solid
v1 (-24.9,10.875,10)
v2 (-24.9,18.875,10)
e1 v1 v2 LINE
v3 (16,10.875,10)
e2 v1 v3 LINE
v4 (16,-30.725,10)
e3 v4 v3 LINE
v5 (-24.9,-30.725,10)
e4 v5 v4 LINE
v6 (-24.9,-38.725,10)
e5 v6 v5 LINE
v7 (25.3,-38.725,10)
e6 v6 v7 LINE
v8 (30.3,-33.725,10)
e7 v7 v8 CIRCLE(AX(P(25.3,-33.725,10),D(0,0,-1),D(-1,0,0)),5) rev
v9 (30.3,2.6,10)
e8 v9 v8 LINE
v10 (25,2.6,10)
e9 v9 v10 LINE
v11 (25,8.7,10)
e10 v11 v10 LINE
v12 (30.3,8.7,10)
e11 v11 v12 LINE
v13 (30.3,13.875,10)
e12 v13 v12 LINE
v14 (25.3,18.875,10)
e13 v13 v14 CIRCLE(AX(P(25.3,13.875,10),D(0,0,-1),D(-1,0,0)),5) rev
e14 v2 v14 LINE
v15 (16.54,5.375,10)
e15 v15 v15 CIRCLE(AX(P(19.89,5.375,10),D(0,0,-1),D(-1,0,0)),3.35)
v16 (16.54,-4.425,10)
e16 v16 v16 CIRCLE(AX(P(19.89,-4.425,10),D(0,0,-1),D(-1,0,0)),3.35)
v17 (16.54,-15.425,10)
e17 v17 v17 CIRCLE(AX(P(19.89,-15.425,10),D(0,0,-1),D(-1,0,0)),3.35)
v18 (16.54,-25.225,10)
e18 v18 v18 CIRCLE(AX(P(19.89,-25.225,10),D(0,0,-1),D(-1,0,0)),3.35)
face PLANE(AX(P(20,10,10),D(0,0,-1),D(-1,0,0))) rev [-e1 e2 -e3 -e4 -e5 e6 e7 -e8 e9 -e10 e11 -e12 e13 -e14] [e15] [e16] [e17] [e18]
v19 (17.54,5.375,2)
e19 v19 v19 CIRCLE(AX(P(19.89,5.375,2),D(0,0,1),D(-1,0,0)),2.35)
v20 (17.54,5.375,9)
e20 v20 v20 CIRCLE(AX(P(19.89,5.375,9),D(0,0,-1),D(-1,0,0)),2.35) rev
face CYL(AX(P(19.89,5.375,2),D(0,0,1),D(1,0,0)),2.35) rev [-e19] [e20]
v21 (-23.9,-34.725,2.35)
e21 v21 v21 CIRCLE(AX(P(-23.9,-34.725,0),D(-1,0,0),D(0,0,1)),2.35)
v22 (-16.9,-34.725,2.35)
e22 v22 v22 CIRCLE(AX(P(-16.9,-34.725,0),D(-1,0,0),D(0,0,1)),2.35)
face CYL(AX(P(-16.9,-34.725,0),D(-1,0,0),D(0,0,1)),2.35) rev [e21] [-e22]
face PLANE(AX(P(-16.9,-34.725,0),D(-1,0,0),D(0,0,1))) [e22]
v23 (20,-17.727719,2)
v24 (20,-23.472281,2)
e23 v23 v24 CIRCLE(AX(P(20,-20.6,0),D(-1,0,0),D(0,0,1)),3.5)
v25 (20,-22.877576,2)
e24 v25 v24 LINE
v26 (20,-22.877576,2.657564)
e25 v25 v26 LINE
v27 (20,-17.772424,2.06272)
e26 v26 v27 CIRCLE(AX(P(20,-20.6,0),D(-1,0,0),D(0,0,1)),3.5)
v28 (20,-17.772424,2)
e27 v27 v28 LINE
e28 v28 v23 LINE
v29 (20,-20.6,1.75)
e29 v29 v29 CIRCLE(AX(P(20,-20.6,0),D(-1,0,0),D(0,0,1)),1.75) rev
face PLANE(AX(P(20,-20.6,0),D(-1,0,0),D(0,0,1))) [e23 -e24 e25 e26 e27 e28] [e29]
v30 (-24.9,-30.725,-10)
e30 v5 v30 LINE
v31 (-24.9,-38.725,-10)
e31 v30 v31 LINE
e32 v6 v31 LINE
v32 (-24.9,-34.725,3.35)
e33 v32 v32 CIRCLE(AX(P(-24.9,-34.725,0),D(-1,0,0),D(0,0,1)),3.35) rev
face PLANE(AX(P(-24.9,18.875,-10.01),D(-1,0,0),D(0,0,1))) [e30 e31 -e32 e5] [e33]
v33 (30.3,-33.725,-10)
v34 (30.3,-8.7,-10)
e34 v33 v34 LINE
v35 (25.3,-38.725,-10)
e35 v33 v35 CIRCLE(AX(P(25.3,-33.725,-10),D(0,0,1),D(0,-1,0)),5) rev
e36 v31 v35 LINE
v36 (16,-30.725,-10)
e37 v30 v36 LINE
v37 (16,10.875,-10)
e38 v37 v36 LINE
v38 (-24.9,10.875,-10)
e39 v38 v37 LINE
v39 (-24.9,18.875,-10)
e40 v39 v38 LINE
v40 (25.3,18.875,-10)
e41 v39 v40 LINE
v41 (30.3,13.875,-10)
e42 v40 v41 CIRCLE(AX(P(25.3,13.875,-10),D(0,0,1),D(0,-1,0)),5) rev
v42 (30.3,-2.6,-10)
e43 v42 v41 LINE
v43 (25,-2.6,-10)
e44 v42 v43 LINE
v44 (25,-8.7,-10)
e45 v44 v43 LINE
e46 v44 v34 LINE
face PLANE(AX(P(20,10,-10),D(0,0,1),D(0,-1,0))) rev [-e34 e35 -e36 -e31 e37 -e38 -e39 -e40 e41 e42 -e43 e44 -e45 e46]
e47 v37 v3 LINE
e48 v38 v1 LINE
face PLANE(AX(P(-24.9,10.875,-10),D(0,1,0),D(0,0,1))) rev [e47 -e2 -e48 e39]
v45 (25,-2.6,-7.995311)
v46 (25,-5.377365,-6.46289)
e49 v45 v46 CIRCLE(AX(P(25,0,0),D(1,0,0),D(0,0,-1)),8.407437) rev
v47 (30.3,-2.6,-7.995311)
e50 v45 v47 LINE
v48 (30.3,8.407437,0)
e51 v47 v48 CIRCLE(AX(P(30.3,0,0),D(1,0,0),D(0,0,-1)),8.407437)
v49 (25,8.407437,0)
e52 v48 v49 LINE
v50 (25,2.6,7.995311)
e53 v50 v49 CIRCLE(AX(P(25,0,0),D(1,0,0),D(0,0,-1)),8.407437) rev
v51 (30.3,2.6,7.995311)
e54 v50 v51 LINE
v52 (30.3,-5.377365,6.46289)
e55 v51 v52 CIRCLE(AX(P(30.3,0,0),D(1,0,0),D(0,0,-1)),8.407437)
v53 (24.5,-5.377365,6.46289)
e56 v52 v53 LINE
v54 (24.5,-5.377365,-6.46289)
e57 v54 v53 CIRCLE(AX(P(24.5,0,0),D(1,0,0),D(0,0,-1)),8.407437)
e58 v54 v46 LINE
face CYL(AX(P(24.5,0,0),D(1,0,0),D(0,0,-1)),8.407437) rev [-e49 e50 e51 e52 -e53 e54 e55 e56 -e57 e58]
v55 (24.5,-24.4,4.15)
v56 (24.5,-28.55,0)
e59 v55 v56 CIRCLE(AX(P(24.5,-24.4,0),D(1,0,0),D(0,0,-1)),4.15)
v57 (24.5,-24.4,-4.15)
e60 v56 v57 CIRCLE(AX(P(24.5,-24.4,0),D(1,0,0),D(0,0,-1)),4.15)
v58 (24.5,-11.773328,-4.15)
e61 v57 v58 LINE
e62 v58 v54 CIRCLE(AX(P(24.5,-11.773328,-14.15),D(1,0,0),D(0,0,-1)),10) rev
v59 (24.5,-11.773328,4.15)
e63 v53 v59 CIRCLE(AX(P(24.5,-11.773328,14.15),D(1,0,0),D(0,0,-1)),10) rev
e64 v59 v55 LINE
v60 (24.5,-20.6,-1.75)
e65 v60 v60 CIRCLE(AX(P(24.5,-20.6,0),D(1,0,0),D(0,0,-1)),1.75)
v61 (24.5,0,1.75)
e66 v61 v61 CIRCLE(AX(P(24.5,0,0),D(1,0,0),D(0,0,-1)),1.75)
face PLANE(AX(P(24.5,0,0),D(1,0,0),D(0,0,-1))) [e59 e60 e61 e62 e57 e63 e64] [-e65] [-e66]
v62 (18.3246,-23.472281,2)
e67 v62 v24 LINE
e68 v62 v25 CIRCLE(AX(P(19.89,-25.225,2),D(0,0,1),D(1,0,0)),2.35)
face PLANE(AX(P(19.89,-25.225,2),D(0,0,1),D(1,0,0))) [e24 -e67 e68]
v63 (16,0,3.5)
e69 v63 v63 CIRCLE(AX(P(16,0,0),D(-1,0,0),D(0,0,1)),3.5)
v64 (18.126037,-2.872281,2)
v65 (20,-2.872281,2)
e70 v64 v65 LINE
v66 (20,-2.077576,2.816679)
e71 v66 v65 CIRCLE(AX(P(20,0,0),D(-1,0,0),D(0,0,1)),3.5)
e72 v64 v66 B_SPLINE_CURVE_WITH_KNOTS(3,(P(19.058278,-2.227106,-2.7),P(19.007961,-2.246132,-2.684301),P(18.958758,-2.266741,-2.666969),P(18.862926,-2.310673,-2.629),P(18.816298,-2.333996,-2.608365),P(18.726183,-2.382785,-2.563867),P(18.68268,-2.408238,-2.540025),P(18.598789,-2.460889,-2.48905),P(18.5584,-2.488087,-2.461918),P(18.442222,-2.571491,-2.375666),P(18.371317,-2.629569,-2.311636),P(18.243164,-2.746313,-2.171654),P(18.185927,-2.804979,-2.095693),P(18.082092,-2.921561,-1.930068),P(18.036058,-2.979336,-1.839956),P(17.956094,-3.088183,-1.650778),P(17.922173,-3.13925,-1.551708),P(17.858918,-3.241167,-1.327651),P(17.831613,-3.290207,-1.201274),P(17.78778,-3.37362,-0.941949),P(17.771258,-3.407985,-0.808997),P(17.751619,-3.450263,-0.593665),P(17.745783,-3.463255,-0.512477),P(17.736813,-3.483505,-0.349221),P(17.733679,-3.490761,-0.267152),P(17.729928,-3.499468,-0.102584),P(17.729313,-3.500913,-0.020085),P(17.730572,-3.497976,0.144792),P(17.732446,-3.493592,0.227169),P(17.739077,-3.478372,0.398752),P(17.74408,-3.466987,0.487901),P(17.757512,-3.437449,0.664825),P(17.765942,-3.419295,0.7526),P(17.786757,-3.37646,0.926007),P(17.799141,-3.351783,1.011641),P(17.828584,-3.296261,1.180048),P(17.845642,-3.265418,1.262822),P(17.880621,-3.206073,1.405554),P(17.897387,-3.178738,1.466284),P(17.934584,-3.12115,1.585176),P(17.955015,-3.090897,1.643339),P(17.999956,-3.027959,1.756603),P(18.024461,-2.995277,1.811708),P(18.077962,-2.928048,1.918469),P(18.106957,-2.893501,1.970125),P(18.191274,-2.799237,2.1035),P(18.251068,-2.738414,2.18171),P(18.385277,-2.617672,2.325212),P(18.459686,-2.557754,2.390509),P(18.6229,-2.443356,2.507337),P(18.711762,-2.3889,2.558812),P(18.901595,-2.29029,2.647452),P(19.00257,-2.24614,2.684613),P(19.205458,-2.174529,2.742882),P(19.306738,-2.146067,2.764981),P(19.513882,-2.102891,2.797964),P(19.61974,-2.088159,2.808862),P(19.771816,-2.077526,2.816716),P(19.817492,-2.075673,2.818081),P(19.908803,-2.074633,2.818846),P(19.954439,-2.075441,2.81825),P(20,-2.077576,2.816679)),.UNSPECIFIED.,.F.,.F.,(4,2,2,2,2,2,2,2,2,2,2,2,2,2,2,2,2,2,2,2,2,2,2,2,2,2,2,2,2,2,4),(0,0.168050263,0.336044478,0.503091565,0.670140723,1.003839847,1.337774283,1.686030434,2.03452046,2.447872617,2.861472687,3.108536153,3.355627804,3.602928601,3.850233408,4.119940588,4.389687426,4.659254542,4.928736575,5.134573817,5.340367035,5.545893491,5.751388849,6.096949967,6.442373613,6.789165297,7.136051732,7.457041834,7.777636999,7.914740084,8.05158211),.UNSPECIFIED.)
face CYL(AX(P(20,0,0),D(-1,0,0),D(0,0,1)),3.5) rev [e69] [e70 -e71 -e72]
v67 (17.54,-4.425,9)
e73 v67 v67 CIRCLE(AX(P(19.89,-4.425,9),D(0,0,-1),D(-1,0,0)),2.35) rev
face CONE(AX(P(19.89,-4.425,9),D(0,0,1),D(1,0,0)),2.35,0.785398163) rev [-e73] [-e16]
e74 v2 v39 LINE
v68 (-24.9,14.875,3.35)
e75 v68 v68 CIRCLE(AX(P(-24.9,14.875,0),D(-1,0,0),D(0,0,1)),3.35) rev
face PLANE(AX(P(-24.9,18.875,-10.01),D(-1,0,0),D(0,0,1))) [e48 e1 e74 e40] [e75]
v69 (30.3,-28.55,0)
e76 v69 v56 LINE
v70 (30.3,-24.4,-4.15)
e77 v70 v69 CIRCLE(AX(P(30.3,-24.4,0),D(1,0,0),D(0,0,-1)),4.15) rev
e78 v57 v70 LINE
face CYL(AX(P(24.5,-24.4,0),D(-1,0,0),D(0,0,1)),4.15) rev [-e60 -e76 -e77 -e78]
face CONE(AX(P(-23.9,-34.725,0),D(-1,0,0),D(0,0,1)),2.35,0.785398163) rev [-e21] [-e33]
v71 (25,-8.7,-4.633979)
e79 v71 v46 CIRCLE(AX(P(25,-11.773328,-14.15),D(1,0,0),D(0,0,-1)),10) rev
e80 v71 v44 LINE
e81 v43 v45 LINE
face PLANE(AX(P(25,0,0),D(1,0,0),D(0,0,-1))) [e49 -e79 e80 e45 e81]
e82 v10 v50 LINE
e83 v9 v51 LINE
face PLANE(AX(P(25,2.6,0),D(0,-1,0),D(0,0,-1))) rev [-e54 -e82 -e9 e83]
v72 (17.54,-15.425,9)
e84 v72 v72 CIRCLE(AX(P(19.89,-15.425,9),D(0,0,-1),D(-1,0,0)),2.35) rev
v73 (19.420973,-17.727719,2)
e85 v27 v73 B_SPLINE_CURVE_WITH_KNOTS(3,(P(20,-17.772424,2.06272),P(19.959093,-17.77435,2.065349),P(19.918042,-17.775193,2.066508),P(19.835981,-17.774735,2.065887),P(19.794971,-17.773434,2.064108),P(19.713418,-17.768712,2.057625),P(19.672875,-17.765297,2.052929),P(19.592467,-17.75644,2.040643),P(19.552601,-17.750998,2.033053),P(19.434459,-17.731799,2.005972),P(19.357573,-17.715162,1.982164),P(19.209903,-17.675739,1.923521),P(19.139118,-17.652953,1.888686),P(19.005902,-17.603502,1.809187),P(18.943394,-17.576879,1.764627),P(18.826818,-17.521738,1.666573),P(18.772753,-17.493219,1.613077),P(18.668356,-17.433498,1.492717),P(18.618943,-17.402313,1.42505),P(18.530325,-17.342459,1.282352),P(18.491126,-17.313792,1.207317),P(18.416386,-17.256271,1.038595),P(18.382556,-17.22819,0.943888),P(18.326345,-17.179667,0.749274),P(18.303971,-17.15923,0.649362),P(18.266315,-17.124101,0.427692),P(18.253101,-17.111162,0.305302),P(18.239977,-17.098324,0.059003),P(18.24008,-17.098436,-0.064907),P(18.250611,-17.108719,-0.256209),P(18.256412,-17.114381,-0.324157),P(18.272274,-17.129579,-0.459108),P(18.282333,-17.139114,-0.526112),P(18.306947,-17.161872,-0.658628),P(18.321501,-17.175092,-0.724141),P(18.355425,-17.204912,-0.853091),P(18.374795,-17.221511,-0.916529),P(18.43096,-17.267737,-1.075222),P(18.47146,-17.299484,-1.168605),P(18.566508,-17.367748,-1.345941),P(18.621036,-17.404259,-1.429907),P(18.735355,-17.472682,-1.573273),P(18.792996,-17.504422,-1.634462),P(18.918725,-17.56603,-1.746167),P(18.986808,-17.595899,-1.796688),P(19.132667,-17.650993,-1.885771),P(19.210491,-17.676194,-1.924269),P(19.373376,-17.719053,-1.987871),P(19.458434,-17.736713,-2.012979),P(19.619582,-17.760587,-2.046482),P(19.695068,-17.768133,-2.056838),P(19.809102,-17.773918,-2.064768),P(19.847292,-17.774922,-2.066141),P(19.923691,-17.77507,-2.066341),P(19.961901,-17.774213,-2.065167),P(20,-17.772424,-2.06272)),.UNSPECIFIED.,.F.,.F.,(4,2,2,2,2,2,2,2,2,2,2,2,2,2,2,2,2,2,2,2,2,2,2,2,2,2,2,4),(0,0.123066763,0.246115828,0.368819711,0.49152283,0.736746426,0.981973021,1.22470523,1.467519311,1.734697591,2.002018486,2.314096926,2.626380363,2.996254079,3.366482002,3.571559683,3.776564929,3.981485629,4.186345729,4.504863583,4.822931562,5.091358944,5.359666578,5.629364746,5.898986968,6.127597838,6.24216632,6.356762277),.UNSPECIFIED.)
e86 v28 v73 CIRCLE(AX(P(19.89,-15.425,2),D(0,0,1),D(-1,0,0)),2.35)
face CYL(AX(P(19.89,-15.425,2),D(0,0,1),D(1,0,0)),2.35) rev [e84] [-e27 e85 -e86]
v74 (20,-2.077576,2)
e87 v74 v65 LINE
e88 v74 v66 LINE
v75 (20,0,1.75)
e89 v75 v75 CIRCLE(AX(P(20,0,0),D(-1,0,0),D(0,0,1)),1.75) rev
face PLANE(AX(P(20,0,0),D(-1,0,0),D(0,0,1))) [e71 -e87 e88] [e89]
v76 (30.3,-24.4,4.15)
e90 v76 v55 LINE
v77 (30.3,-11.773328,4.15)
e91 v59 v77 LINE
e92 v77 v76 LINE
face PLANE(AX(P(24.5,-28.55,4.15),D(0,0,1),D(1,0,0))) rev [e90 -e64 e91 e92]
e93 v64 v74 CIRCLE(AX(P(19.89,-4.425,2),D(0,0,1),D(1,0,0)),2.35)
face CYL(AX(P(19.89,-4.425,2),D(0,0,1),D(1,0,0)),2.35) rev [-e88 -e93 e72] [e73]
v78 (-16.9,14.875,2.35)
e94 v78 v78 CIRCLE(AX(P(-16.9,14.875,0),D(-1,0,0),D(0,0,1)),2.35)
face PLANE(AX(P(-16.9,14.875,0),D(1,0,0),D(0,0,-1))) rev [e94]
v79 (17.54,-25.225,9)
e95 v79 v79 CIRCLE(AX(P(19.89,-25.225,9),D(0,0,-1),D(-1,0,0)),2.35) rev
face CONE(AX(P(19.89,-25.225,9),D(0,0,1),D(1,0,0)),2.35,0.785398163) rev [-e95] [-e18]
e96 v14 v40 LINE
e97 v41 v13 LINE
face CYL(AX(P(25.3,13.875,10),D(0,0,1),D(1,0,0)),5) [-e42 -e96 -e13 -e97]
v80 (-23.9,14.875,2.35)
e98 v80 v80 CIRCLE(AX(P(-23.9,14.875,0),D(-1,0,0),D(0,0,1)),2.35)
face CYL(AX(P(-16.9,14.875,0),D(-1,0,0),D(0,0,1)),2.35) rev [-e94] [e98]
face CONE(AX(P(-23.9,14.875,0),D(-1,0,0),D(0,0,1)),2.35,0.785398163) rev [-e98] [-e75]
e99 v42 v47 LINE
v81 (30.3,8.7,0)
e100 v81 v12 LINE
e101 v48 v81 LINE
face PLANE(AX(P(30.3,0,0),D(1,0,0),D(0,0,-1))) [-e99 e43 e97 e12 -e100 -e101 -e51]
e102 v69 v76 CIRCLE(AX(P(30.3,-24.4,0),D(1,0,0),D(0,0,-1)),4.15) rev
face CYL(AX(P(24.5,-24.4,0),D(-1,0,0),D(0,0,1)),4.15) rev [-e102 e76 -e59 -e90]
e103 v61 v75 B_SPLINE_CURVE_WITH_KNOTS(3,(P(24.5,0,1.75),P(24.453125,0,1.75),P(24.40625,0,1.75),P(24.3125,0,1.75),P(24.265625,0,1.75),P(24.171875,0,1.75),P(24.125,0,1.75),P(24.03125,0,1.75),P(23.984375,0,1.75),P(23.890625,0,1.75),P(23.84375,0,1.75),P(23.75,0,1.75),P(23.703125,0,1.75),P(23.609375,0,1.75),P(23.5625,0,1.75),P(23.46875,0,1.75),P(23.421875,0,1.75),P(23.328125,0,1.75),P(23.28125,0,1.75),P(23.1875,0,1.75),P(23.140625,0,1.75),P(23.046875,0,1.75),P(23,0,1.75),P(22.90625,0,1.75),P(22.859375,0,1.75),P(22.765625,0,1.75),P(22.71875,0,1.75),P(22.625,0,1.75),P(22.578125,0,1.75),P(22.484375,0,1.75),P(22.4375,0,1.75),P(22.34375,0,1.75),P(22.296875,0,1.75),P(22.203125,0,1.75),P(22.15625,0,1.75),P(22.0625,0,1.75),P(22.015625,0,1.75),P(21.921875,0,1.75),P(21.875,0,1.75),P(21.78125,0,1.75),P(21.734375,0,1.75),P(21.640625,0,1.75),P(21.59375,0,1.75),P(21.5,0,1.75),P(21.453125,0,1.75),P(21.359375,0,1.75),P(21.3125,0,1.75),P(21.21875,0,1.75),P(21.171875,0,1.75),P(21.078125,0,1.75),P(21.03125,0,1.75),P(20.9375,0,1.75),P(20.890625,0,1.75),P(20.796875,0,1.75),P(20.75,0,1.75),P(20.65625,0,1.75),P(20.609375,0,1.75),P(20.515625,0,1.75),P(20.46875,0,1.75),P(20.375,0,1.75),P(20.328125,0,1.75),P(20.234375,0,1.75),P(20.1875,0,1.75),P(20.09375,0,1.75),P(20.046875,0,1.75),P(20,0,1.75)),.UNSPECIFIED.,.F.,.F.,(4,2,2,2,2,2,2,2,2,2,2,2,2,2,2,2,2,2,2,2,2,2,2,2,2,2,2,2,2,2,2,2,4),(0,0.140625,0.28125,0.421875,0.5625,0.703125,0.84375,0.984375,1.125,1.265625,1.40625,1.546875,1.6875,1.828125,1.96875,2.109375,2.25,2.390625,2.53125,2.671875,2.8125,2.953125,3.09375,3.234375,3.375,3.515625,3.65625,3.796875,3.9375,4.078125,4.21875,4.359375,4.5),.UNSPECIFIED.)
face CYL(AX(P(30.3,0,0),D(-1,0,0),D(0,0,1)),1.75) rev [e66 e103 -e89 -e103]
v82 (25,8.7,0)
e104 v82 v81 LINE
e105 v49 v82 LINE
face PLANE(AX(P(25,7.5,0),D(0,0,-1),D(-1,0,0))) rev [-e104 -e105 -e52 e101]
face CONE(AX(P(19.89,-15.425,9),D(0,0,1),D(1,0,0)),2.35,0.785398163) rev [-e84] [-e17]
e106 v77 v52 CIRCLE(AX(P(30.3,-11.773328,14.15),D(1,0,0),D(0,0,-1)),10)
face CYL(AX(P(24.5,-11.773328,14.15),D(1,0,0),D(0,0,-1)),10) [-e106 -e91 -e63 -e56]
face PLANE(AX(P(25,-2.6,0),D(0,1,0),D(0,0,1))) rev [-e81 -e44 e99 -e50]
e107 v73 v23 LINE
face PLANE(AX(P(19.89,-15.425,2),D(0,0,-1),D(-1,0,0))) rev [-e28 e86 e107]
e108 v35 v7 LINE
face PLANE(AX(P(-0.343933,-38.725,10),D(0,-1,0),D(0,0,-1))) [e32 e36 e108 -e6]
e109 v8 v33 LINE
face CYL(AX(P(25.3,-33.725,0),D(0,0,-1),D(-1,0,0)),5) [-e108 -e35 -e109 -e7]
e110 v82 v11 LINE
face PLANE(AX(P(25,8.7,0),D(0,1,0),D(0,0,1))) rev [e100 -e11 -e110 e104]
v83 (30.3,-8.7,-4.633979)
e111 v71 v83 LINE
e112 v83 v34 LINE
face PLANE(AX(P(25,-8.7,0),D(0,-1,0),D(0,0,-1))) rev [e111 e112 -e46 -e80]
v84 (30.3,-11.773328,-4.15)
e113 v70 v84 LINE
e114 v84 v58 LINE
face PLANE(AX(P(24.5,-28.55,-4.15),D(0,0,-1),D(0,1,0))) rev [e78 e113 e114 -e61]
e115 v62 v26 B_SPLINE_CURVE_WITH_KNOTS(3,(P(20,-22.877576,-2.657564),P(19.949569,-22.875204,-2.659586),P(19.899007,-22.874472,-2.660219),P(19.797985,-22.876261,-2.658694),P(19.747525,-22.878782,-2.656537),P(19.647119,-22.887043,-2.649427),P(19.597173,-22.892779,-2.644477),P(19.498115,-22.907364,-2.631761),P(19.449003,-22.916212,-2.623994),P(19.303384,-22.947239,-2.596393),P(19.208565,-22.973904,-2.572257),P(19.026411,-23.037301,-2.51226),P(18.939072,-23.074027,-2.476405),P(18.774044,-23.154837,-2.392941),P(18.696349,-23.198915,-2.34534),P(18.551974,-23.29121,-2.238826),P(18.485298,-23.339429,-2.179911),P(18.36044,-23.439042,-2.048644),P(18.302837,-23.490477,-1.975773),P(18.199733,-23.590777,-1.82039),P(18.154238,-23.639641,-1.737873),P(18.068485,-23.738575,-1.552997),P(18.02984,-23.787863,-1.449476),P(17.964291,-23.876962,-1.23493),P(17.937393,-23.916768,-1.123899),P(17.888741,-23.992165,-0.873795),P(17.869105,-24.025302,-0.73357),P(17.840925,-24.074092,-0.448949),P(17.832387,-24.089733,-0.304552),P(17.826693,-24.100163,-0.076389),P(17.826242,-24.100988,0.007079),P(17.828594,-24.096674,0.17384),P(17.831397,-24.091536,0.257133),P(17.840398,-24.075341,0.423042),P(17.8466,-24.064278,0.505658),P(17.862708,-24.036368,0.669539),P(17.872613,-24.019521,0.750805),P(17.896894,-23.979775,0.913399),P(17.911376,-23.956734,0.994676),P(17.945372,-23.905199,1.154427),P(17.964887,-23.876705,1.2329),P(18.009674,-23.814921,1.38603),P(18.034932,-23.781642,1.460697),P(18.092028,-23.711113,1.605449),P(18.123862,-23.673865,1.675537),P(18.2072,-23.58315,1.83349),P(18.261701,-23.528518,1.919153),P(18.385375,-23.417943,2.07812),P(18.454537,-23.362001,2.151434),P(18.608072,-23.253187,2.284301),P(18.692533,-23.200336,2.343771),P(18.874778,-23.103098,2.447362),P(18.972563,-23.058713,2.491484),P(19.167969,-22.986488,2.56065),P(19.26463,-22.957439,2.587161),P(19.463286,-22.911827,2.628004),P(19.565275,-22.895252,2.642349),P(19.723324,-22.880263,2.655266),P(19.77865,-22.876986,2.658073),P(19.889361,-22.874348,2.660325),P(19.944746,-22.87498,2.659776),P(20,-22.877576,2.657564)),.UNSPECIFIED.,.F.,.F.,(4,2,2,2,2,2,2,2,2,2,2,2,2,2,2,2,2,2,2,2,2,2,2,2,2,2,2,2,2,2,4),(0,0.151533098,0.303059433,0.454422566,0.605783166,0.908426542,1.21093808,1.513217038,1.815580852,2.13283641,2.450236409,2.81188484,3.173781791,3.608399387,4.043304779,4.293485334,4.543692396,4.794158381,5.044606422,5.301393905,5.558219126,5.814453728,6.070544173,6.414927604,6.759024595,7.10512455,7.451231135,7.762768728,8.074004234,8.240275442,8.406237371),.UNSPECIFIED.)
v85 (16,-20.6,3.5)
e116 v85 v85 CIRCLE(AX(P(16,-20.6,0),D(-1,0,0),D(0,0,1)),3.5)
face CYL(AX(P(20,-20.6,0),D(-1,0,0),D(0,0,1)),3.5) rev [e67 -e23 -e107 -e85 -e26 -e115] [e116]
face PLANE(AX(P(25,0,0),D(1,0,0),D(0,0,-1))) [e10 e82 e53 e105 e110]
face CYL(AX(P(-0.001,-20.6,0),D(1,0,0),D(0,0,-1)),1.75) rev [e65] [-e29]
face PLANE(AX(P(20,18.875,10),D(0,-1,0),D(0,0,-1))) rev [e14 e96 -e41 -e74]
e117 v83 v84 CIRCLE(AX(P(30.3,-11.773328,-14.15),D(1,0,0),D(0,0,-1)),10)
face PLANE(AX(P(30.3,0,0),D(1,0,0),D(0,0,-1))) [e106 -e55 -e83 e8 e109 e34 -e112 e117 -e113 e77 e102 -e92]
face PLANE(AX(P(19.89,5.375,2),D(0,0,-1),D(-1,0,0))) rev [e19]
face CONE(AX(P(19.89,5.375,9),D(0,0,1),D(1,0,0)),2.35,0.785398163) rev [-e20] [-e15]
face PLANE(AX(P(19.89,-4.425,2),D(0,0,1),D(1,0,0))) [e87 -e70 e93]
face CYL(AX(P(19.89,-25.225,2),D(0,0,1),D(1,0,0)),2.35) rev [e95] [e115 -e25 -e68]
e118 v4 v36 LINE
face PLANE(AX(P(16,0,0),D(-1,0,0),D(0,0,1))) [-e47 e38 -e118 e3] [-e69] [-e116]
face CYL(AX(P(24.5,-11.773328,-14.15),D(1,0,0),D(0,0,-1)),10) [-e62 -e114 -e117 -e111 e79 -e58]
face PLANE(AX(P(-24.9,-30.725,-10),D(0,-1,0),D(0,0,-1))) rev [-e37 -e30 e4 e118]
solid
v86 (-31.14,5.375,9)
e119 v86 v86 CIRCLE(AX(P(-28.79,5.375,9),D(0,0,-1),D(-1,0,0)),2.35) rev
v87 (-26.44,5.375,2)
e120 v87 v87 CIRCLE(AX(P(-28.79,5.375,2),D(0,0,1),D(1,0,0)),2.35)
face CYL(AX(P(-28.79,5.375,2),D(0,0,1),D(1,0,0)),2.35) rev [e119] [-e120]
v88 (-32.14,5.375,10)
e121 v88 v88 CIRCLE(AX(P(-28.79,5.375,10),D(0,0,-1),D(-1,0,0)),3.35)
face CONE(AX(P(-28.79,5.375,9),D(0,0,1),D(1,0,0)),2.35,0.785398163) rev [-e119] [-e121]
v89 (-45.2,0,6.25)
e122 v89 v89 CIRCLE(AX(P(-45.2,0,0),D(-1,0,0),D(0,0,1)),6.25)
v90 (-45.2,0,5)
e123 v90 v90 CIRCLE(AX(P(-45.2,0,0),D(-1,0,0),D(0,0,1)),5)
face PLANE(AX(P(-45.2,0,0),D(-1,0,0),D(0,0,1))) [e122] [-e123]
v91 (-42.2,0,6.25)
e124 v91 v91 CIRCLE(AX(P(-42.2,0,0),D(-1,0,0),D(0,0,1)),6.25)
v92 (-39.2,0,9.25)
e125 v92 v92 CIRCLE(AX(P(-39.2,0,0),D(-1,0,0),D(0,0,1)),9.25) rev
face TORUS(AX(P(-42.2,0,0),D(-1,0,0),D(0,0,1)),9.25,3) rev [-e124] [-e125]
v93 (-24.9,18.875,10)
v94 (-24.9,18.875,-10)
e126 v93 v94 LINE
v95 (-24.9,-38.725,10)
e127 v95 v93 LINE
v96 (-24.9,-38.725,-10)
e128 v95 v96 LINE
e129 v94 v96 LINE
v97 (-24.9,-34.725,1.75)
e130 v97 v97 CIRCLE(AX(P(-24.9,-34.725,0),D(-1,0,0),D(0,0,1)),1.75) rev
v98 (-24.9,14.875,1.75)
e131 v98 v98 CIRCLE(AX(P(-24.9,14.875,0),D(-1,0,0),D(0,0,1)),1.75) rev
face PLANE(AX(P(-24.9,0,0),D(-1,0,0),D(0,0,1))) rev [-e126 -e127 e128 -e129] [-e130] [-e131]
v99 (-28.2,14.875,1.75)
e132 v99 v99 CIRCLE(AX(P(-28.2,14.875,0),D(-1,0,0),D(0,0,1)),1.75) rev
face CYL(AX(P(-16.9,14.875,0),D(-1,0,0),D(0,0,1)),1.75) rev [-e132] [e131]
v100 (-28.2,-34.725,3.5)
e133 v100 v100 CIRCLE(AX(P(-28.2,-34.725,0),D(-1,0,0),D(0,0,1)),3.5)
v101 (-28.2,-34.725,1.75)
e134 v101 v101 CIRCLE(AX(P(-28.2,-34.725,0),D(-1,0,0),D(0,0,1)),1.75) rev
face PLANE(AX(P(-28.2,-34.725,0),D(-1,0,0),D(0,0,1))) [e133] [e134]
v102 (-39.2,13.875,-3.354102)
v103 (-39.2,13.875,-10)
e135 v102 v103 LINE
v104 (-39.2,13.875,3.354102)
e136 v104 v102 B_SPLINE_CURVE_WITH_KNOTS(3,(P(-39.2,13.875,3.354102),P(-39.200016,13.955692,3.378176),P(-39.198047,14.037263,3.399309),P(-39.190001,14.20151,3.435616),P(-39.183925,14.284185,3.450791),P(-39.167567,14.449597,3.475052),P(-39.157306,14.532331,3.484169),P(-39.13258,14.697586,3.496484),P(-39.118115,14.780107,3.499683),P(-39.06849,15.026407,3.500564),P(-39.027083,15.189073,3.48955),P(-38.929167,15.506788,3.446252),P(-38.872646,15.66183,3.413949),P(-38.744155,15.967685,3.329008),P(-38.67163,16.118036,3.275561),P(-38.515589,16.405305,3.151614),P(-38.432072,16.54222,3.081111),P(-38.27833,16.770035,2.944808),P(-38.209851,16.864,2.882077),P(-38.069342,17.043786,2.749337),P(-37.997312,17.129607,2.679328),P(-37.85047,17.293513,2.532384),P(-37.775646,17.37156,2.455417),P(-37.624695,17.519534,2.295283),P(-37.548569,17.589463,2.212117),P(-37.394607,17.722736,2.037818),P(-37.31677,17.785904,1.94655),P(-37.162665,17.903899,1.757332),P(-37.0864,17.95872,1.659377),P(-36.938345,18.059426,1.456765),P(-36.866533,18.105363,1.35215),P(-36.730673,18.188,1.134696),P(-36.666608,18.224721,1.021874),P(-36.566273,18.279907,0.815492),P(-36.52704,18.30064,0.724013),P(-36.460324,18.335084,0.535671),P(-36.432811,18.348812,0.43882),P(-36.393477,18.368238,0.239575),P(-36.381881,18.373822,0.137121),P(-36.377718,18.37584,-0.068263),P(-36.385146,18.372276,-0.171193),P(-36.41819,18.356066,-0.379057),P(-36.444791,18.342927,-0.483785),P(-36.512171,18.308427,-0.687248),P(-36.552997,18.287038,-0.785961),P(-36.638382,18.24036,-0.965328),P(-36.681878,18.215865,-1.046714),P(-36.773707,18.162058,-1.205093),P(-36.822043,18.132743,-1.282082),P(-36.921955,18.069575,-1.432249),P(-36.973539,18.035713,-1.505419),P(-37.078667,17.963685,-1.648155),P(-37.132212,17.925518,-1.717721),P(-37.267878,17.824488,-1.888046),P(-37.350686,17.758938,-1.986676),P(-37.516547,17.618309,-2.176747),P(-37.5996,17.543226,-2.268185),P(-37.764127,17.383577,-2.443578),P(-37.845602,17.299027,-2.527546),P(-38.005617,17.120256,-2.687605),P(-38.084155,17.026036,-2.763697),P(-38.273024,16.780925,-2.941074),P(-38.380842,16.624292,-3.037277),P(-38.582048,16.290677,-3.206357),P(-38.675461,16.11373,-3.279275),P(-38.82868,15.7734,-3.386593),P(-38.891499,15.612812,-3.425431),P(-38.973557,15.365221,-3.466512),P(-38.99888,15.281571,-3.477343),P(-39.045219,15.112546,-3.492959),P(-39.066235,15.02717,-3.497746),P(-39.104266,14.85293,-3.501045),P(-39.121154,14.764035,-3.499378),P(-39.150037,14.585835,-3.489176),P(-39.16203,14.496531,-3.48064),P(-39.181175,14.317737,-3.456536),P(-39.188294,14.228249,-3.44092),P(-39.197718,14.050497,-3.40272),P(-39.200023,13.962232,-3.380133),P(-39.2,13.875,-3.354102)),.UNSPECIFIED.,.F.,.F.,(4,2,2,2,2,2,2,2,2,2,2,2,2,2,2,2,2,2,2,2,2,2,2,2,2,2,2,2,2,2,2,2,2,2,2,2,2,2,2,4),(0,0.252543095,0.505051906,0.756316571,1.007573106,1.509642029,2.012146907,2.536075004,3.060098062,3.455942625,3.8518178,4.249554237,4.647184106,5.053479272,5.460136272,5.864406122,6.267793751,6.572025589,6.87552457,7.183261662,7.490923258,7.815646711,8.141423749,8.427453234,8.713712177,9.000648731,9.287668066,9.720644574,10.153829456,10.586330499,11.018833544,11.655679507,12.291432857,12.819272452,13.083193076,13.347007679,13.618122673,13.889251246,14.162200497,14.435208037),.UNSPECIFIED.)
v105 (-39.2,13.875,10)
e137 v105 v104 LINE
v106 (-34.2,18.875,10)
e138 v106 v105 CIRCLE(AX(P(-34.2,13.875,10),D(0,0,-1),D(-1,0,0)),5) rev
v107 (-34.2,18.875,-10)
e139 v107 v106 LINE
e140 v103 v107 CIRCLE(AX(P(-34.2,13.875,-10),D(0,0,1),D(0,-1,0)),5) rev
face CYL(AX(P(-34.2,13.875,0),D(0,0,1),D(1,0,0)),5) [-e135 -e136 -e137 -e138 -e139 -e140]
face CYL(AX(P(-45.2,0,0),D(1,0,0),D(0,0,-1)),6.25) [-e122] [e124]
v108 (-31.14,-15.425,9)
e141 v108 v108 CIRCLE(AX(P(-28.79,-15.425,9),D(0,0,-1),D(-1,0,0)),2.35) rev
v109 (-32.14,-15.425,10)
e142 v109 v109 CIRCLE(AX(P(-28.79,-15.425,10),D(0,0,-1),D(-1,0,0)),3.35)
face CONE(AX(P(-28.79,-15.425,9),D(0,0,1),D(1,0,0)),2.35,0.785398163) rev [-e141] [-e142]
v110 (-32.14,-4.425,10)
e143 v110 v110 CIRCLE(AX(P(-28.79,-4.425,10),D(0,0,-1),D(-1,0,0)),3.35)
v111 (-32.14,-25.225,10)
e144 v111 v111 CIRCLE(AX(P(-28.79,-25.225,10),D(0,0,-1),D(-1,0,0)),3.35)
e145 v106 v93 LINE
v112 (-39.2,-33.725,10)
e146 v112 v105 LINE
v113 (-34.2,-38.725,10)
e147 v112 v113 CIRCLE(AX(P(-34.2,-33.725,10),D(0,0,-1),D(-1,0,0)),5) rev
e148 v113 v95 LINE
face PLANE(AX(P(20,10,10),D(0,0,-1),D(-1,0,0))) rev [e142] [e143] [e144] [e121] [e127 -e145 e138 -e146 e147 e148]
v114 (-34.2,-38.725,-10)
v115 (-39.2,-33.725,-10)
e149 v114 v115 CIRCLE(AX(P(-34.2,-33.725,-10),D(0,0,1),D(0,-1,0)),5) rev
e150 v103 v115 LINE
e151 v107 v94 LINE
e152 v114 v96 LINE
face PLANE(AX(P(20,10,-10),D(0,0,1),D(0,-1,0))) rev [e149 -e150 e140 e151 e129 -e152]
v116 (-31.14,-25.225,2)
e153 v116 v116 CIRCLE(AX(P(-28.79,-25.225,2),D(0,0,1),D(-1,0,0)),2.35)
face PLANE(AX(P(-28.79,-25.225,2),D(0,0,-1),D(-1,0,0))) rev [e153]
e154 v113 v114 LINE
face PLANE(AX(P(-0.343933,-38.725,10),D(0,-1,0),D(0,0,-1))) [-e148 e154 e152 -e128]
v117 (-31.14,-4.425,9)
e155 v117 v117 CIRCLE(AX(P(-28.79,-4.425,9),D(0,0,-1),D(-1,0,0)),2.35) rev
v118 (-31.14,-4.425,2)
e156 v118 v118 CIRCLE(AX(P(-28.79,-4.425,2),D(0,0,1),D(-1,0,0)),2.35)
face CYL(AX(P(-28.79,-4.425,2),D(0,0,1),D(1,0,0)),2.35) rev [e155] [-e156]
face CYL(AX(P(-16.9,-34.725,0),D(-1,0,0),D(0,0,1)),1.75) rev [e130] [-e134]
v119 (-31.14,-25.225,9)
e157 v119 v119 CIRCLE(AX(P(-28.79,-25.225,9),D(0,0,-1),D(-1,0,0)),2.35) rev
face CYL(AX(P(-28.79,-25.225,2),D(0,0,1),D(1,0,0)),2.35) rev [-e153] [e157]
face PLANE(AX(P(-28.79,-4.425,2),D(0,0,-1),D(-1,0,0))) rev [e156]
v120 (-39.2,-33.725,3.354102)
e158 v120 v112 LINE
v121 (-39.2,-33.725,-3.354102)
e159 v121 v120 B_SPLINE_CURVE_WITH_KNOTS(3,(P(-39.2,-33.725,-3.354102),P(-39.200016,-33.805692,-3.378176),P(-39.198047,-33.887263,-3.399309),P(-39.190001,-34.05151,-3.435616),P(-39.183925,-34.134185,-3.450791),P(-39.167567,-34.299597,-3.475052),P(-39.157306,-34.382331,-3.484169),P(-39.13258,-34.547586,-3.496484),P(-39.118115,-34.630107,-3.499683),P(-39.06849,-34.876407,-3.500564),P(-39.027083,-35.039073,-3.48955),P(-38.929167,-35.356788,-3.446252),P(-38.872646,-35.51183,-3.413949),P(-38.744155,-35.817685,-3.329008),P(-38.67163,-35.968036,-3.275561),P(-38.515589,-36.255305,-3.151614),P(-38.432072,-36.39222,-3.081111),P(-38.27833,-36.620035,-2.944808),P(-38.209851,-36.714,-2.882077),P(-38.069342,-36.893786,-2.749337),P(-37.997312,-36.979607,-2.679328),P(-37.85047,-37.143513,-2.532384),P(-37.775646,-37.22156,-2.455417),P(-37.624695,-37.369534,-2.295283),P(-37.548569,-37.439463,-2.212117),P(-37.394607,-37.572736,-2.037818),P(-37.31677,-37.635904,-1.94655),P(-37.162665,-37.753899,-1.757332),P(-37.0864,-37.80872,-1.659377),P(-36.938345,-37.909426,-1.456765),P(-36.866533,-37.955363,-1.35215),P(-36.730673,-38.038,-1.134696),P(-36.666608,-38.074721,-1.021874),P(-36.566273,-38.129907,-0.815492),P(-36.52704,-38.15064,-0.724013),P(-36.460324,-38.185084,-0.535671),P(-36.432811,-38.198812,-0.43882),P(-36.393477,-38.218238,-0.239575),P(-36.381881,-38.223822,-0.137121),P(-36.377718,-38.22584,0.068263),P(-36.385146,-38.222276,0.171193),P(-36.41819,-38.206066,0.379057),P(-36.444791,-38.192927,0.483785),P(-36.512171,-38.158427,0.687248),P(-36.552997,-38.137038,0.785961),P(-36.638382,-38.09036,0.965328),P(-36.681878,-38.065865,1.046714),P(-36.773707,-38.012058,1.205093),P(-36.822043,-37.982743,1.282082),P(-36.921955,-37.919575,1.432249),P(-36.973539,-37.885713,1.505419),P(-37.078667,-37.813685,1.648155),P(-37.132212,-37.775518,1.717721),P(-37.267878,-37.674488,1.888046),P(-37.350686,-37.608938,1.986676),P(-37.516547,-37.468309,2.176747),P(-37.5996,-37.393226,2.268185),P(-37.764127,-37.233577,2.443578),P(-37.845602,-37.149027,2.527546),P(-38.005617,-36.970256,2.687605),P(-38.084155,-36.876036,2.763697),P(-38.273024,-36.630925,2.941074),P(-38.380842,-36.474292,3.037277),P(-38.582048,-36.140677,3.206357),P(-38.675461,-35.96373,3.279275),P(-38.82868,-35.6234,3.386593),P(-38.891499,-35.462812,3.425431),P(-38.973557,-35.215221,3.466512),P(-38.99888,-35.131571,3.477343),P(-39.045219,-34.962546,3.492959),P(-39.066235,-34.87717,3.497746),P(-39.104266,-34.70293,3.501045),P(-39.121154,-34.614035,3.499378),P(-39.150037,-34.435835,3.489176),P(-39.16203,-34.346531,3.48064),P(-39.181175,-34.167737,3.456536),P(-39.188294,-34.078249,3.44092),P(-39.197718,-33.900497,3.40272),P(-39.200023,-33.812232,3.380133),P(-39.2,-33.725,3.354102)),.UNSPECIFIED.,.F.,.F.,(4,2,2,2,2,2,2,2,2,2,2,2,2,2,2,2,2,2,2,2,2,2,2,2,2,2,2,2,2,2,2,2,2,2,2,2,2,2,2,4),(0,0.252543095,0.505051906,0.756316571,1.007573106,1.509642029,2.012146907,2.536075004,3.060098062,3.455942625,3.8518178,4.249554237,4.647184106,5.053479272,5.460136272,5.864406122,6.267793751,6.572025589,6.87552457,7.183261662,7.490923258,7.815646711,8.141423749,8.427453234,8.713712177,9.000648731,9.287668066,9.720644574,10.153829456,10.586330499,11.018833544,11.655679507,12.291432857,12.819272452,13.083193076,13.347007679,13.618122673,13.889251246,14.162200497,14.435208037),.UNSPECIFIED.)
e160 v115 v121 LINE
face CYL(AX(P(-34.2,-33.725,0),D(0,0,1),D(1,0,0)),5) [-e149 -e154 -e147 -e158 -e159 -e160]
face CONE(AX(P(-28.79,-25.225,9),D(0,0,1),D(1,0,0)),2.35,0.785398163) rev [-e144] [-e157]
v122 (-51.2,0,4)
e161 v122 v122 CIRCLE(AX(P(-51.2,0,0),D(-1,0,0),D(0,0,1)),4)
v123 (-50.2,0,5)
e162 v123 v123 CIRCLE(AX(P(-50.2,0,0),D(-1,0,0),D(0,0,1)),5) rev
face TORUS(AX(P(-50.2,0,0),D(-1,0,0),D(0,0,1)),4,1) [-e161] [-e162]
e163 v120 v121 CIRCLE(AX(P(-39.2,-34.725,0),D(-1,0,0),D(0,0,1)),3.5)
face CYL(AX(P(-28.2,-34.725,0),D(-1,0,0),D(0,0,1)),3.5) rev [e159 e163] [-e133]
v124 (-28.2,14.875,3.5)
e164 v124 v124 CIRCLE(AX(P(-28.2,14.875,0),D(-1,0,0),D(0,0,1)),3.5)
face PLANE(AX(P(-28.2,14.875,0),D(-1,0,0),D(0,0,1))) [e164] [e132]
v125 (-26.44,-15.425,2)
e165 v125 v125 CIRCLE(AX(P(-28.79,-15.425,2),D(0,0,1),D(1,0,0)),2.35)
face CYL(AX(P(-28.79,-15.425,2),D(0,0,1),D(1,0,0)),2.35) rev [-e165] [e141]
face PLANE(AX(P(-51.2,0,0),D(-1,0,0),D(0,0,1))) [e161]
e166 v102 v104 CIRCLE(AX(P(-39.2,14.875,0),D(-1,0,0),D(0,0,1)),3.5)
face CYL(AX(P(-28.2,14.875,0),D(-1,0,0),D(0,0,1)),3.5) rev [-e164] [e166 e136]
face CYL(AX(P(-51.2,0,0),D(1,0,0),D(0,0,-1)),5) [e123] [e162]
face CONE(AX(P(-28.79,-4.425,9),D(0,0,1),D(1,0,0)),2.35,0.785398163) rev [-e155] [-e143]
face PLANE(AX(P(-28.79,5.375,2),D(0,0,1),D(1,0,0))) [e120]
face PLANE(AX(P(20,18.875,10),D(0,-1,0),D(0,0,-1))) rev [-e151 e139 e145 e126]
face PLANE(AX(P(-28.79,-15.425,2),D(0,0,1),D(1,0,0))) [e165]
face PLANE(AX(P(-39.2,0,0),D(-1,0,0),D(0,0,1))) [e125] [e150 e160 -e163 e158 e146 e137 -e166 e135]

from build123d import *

# Parameters (mm, degrees)
SKETCH1_W              = 20
SKETCH1_H              = 20
BOSS_EXTRUDE1_DEPTH    = 20
SKETCH2_W              = 20
SKETCH2_H              = 70
BOSS_EXTRUDE2_DEPTH    = 10.3
CUT_EXTRUDE1_DEPTH     = 5.8
FILLET1_R              = 4.15
FILLET2_R              = 10
SKETCH5_R              = 1.75
CUT_EXTRUDE2_DEPTH     = 48.361271098
CUT_EXTRUDE3_REACH     = 45.878
SKETCH6_R              = 1.75
SKETCH13_W             = 20
SKETCH13_H             = 20
CUT_EXTRUDE9_DEPTH     = 20
CUT_EXTRUDE18_DEPTH    = 5.3
SKETCH32_W             = 20
SKETCH32_H             = 3.725
BOSS_EXTRUDE3_DEPTH    = 10.3
SKETCH31_W             = 20
SKETCH31_H             = 16.125
CUT_EXTRUDE19_DEPTH    = 42.300310229
SKETCH34_W             = 20
SKETCH34_H             = 57.6
SKETCH34_R             = 1.75
BOSS_EXTRUDE5_DEPTH    = 4
SKETCH35_W             = 20
SKETCH35_H             = 8
BOSS_EXTRUDE6_DEPTH    = 40.9
SKETCH37_W             = 20
SKETCH37_H             = 57.6
BOSS_EXTRUDE7_DEPTH    = 14.3
SKETCH38_R             = 2.35
CUT_EXTRUDE20_DEPTH    = 8
CHAMFER1_SIZE          = 1
SKETCH41_R             = 3.5
CUT_EXTRUDE23_DEPTH    = 4
SKETCH42_R             = 1.75
CUT_EXTRUDE24_DEPTH    = 22.3
SKETCH43_R             = 3.5
CUT_EXTRUDE25_DEPTH    = 11
FILLET3_R              = 5
SPLIT1_SURFACE_1_BACK  = 93.455
SPLIT1_SURFACE_1_DEPTH = 186.91
SPLIT1_SURFACE_2_BACK  = 93.455
SPLIT1_SURFACE_2_DEPTH = 186.91
SKETCH45_R             = 2.35
CUT_EXTRUDE26_DEPTH    = 8
CHAMFER2_SIZE          = 1
SKETCH46_R             = 5
BOSS_EXTRUDE8_DEPTH    = 12
FILLET5_R              = 1
SKETCH50_R             = 6.25
BOSS_EXTRUDE9_DEPTH    = 6
FILLET6_R              = 3


# Some blends are built 0.0001 mm under size
with BuildPart() as part:
    # Sketch1 → Boss-Extrude1 (new body)
    with BuildSketch(Plane(origin=(0, 0, 0), x_dir=(0, 0, -1), z_dir=(1, 0, 0))):
        Rectangle(SKETCH1_W, SKETCH1_H)
    extrude(amount=BOSS_EXTRUDE1_DEPTH)

    # Sketch2 → Boss-Extrude2 (add)
    with BuildSketch(Plane(origin=(20, 0, 0), x_dir=(0, 0, -1), z_dir=(1, 0, 0))):
        Rectangle(SKETCH2_W, SKETCH2_H)
    extrude(amount=BOSS_EXTRUDE2_DEPTH)

    # Sketch4 → Cut-Extrude1 (cut)
    with BuildSketch(Plane(origin=(30.3, 0, 0), x_dir=(0, 0, -1), z_dir=(1, 0, 0))):
        with BuildLine():
            Line((4.15, -28.55), (-4.15, -28.55))
            Line((-4.15, -28.55), (-4.15, -7.311805523))
            ThreePointArc((-4.15, -7.311805523), (0, 8.407437184), (4.15, -7.311805523))
            Line((4.15, -7.311805523), (4.15, -28.55))
        make_face()
    extrude(amount=-CUT_EXTRUDE1_DEPTH, mode=Mode.SUBTRACT)

    # Fillet1
    fillet1_edges = [part.edges().sort_by_distance(p)[0] for p in [
        (27.4, -28.55, 4.15),
        (27.4, -28.55, -4.15),
    ]]
    fillet(fillet1_edges, radius=FILLET1_R - 0.0001)  # a hair under: the kernel refuses the full size

    # Fillet2
    fillet2_edges = [part.edges().sort_by_distance(p)[0] for p in [
        (27.4, -7.311805523, 4.15),
        (27.4, -7.311805523, -4.15),
    ]]
    fillet(fillet2_edges, radius=FILLET2_R)

    # Sketch5 → Cut-Extrude2 (cut, through all)
    with BuildSketch(Plane.ZY):
        Circle(SKETCH5_R)
    extrude(amount=-CUT_EXTRUDE2_DEPTH, mode=Mode.SUBTRACT)

    # Sketch6 → Cut-Extrude3 (cut, up to next)
    with BuildSketch(Plane(origin=(24.5, 0, 0), x_dir=(0, 0, -1), z_dir=(1, 0, 0)), mode=Mode.PRIVATE) as cut_extrude3_sk1:
        with Locations((0, -20.6)):
            Circle(SKETCH6_R)
    cut_extrude3_tool1 = extrude(cut_extrude3_sk1.sketch, amount=-CUT_EXTRUDE3_REACH, mode=Mode.PRIVATE) & part.part
    add(cut_extrude3_tool1.solids().sort_by_distance((24.5, -20.6, 0))[0], mode=Mode.SUBTRACT)

    # Sketch13 → Cut-Extrude9 (cut)
    with BuildSketch(Plane.ZY):
        Rectangle(SKETCH13_W, SKETCH13_H)
    extrude(amount=-CUT_EXTRUDE9_DEPTH, mode=Mode.SUBTRACT)

    # Sketch29 → Cut-Extrude18 (cut)
    with BuildSketch(Plane(origin=(30.3, 0, 0), x_dir=(0, 0, -1), z_dir=(1, 0, 0))):
        Polygon((15.109449768, -8.7), (15.109449768, -2.6), (0, -2.6), (0, -3.8), (0, -7.5), (0, -8.7), align=None)
        Polygon((0, 2.6), (-15.109449768, 2.6), (-15.109449768, 8.7), (0, 8.7), (0, 7.5), (0, 3.8), align=None)
    extrude(amount=-CUT_EXTRUDE18_DEPTH, mode=Mode.SUBTRACT)

    # Sketch32 → Boss-Extrude3 (add)
    with BuildSketch(Plane(origin=(30.3, 0, 0), x_dir=(0, 0, -1), z_dir=(1, 0, 0))):
        with Locations((0, -36.8625)):
            Rectangle(SKETCH32_W, SKETCH32_H)
    extrude(amount=-BOSS_EXTRUDE3_DEPTH)

    # Sketch31 → Cut-Extrude19 (cut, through all)
    with BuildSketch(Plane(origin=(30.3, 0, 0), x_dir=(0, 0, -1), z_dir=(1, 0, 0))):
        with Locations((0, 26.9375)):
            Rectangle(SKETCH31_W, SKETCH31_H)
    extrude(amount=-CUT_EXTRUDE19_DEPTH, mode=Mode.SUBTRACT)

    # Sketch34 → Boss-Extrude5 (add)
    with BuildSketch(Plane.ZY.offset(-20)):
        with Locations((0, -9.925)):
            Rectangle(SKETCH34_W, SKETCH34_H)
        with Locations(Location((0, -20.6, 0), (0, 0, 180))):
            Circle(SKETCH34_R, mode=Mode.SUBTRACT)
        Circle(SKETCH34_R, mode=Mode.SUBTRACT)
    extrude(amount=BOSS_EXTRUDE5_DEPTH)

    # Sketch35 → Boss-Extrude6 (add)
    with BuildSketch(Plane.ZY.offset(-16)):
        with Locations((0, 14.875)):
            Rectangle(SKETCH35_W, SKETCH35_H)
        with Locations((0, -34.725)):
            Rectangle(SKETCH35_W, SKETCH35_H)
    extrude(amount=BOSS_EXTRUDE6_DEPTH)

    # Sketch37 → Boss-Extrude7 (add)
    with BuildSketch(Plane.ZY.offset(24.9)):
        with Locations((0, -9.925)):
            Rectangle(SKETCH37_W, SKETCH37_H)
    extrude(amount=BOSS_EXTRUDE7_DEPTH)

    # Sketch38 → Cut-Extrude20 (cut)
    with BuildSketch(Plane.XY.offset(10)):
        with Locations((-28.79, 5.375)):
            Circle(SKETCH38_R)
        with Locations(Location((-28.79, -4.425, 0), (0, 0, 180))):
            Circle(SKETCH38_R)
        with Locations(Location((-28.79, -25.225, 0), (0, 0, 180))):
            Circle(SKETCH38_R)
        with Locations((-28.79, -15.425)):
            Circle(SKETCH38_R)
        with Locations(Location((19.89, 5.375, 0), (0, 0, 180))):
            Circle(SKETCH38_R)
        with Locations((19.89, -4.425)):
            Circle(SKETCH38_R)
        with Locations(Location((19.89, -15.425, 0), (0, 0, 180))):
            Circle(SKETCH38_R)
        with Locations((19.89, -25.225)):
            Circle(SKETCH38_R)
    extrude(amount=-CUT_EXTRUDE20_DEPTH, mode=Mode.SUBTRACT)

    # Chamfer1
    chamfer1_edges = [part.edges().sort_by_distance(p)[0] for p in [
        (22.24, 5.375, 10),
        (-31.14, -15.425, 10),
        (-26.44, -25.225, 10),
        (-26.44, -4.425, 10),
        (17.54, -4.425, 10),
        (22.24, -15.425, 10),
        (17.54, -25.225, 10),
        (-31.14, 5.375, 10),
    ]]
    chamfer(chamfer1_edges, length=CHAMFER1_SIZE)

    # Sketch41 → Cut-Extrude23 (cut)
    with BuildSketch(Plane.ZY.offset(-16)):
        Circle(SKETCH41_R)
        with Locations((0, -20.6)):
            Circle(SKETCH41_R)
    extrude(amount=-CUT_EXTRUDE23_DEPTH, mode=Mode.SUBTRACT)

    # Sketch42 → Cut-Extrude24 (cut)
    with BuildSketch(Plane.ZY.offset(39.2)):
        with Locations((0, -34.725)):
            Circle(SKETCH42_R)
        with Locations(Location((0, 14.875, 0), (0, 0, 180))):
            Circle(SKETCH42_R)
    extrude(amount=-CUT_EXTRUDE24_DEPTH, mode=Mode.SUBTRACT)

    # Sketch43 → Cut-Extrude25 (cut)
    with BuildSketch(Plane.ZY.offset(39.2)):
        with Locations((0, 14.875)):
            Circle(SKETCH43_R)
        with Locations((0, -34.725)):
            Circle(SKETCH43_R)
    extrude(amount=-CUT_EXTRUDE25_DEPTH, mode=Mode.SUBTRACT)

    # Fillet3
    # the kernel refuses this fillet: 5 mm, written as the material it takes off along each edge
    with BuildSketch(Plane(origin=(30.3, -38.725, -22.5), x_dir=(-1, 0, 0), z_dir=(0, 0, 1)), Plane(origin=(-39.2, 18.875, -22.5), x_dir=(1, 0, 0), z_dir=(0, 0, 1))) as fillet3_piece_1:
        with BuildLine():
            CenterArc((FILLET3_R, -FILLET3_R), FILLET3_R, 90, 90)
            Line((0, -FILLET3_R), (0, 0))
            Line((0, 0), (FILLET3_R, 0))
        make_face()
    extrude(amount=45, mode=Mode.SUBTRACT)
    with BuildSketch(Plane(origin=(30.3, 18.875, -22.5), x_dir=(-1, 0, 0), z_dir=(0, 0, 1)), Plane(origin=(-39.2, -38.725, 22.5), x_dir=(0, 1, 0), z_dir=(0, 0, -1))) as fillet3_piece_2:
        with BuildLine():
            CenterArc((FILLET3_R, FILLET3_R), FILLET3_R, 180, 90)
            Line((0, FILLET3_R), (0, 0))
            Line((0, 0), (FILLET3_R, 0))
        make_face()
    extrude(amount=45, mode=Mode.SUBTRACT)


with BuildPart() as body_2:
    # Split1: the piece behind the surface
    add(part.part)
    # Split1 surface: a surface, the sketch's curves swept straight by 186.91 mm
    with BuildLine(Plane.XY.offset(10).offset(-SPLIT1_SURFACE_1_BACK), mode=Mode.PRIVATE) as split1_surface_1_path:
        Line((-24.9, 18.875), (-24.9, -38.725))
    split1_surface_1 = Shell.extrude(split1_surface_1_path.wire(), (0 * SPLIT1_SURFACE_1_DEPTH, 0 * SPLIT1_SURFACE_1_DEPTH, 1 * SPLIT1_SURFACE_1_DEPTH))
    split(bisect_by=split1_surface_1, keep=Keep.BOTTOM)

    # Sketch46 → Boss-Extrude8 (add)
    with BuildSketch(Plane.ZY.offset(39.2)):
        Circle(SKETCH46_R)
    extrude(amount=BOSS_EXTRUDE8_DEPTH)

    # Fillet5
    fillet5_edges = [body_2.edges().sort_by_distance(p)[0] for p in [
        (-51.2, 0, -5),
    ]]
    fillet(fillet5_edges, radius=FILLET5_R)

    # Sketch50 → Boss-Extrude9 (add)
    with BuildSketch(Plane.ZY.offset(39.2)):
        Circle(SKETCH50_R)
    extrude(amount=BOSS_EXTRUDE9_DEPTH)

    # Fillet6
    fillet6_edges = [body_2.edges().sort_by_distance(p)[0] for p in [
        (-39.2, 0, -6.25),
    ]]
    fillet(fillet6_edges, radius=FILLET6_R)


with BuildPart() as part_1:
    add(part.part)

    # Split1: split by a surface, the side it looks to stays
    # Split1 surface: a surface, the sketch's curves swept straight by 186.91 mm
    with BuildLine(Plane.XY.offset(10).offset(-SPLIT1_SURFACE_2_BACK), mode=Mode.PRIVATE) as split1_surface_2_path:
        Line((-24.9, 18.875), (-24.9, -38.725))
    split1_surface_2 = Shell.extrude(split1_surface_2_path.wire(), (0 * SPLIT1_SURFACE_2_DEPTH, 0 * SPLIT1_SURFACE_2_DEPTH, 1 * SPLIT1_SURFACE_2_DEPTH))
    split(bisect_by=split1_surface_2, keep=Keep.TOP)

    # Sketch45 → Cut-Extrude26 (cut)
    with BuildSketch(Plane.ZY.offset(24.9)):
        with Locations((0, 14.875)):
            Circle(SKETCH45_R)
        with Locations((0, -34.725)):
            Circle(SKETCH45_R)
    extrude(amount=-CUT_EXTRUDE26_DEPTH, mode=Mode.SUBTRACT)

    # Chamfer2
    chamfer2_edges = [part_1.edges().sort_by_distance(p)[0] for p in [
        (-24.9, 14.875, -2.35),
        (-24.9, -34.725, -2.35),
    ]]
    chamfer(chamfer2_edges, length=CHAMFER2_SIZE)


solid = Compound([body_2.part, part_1.part])
